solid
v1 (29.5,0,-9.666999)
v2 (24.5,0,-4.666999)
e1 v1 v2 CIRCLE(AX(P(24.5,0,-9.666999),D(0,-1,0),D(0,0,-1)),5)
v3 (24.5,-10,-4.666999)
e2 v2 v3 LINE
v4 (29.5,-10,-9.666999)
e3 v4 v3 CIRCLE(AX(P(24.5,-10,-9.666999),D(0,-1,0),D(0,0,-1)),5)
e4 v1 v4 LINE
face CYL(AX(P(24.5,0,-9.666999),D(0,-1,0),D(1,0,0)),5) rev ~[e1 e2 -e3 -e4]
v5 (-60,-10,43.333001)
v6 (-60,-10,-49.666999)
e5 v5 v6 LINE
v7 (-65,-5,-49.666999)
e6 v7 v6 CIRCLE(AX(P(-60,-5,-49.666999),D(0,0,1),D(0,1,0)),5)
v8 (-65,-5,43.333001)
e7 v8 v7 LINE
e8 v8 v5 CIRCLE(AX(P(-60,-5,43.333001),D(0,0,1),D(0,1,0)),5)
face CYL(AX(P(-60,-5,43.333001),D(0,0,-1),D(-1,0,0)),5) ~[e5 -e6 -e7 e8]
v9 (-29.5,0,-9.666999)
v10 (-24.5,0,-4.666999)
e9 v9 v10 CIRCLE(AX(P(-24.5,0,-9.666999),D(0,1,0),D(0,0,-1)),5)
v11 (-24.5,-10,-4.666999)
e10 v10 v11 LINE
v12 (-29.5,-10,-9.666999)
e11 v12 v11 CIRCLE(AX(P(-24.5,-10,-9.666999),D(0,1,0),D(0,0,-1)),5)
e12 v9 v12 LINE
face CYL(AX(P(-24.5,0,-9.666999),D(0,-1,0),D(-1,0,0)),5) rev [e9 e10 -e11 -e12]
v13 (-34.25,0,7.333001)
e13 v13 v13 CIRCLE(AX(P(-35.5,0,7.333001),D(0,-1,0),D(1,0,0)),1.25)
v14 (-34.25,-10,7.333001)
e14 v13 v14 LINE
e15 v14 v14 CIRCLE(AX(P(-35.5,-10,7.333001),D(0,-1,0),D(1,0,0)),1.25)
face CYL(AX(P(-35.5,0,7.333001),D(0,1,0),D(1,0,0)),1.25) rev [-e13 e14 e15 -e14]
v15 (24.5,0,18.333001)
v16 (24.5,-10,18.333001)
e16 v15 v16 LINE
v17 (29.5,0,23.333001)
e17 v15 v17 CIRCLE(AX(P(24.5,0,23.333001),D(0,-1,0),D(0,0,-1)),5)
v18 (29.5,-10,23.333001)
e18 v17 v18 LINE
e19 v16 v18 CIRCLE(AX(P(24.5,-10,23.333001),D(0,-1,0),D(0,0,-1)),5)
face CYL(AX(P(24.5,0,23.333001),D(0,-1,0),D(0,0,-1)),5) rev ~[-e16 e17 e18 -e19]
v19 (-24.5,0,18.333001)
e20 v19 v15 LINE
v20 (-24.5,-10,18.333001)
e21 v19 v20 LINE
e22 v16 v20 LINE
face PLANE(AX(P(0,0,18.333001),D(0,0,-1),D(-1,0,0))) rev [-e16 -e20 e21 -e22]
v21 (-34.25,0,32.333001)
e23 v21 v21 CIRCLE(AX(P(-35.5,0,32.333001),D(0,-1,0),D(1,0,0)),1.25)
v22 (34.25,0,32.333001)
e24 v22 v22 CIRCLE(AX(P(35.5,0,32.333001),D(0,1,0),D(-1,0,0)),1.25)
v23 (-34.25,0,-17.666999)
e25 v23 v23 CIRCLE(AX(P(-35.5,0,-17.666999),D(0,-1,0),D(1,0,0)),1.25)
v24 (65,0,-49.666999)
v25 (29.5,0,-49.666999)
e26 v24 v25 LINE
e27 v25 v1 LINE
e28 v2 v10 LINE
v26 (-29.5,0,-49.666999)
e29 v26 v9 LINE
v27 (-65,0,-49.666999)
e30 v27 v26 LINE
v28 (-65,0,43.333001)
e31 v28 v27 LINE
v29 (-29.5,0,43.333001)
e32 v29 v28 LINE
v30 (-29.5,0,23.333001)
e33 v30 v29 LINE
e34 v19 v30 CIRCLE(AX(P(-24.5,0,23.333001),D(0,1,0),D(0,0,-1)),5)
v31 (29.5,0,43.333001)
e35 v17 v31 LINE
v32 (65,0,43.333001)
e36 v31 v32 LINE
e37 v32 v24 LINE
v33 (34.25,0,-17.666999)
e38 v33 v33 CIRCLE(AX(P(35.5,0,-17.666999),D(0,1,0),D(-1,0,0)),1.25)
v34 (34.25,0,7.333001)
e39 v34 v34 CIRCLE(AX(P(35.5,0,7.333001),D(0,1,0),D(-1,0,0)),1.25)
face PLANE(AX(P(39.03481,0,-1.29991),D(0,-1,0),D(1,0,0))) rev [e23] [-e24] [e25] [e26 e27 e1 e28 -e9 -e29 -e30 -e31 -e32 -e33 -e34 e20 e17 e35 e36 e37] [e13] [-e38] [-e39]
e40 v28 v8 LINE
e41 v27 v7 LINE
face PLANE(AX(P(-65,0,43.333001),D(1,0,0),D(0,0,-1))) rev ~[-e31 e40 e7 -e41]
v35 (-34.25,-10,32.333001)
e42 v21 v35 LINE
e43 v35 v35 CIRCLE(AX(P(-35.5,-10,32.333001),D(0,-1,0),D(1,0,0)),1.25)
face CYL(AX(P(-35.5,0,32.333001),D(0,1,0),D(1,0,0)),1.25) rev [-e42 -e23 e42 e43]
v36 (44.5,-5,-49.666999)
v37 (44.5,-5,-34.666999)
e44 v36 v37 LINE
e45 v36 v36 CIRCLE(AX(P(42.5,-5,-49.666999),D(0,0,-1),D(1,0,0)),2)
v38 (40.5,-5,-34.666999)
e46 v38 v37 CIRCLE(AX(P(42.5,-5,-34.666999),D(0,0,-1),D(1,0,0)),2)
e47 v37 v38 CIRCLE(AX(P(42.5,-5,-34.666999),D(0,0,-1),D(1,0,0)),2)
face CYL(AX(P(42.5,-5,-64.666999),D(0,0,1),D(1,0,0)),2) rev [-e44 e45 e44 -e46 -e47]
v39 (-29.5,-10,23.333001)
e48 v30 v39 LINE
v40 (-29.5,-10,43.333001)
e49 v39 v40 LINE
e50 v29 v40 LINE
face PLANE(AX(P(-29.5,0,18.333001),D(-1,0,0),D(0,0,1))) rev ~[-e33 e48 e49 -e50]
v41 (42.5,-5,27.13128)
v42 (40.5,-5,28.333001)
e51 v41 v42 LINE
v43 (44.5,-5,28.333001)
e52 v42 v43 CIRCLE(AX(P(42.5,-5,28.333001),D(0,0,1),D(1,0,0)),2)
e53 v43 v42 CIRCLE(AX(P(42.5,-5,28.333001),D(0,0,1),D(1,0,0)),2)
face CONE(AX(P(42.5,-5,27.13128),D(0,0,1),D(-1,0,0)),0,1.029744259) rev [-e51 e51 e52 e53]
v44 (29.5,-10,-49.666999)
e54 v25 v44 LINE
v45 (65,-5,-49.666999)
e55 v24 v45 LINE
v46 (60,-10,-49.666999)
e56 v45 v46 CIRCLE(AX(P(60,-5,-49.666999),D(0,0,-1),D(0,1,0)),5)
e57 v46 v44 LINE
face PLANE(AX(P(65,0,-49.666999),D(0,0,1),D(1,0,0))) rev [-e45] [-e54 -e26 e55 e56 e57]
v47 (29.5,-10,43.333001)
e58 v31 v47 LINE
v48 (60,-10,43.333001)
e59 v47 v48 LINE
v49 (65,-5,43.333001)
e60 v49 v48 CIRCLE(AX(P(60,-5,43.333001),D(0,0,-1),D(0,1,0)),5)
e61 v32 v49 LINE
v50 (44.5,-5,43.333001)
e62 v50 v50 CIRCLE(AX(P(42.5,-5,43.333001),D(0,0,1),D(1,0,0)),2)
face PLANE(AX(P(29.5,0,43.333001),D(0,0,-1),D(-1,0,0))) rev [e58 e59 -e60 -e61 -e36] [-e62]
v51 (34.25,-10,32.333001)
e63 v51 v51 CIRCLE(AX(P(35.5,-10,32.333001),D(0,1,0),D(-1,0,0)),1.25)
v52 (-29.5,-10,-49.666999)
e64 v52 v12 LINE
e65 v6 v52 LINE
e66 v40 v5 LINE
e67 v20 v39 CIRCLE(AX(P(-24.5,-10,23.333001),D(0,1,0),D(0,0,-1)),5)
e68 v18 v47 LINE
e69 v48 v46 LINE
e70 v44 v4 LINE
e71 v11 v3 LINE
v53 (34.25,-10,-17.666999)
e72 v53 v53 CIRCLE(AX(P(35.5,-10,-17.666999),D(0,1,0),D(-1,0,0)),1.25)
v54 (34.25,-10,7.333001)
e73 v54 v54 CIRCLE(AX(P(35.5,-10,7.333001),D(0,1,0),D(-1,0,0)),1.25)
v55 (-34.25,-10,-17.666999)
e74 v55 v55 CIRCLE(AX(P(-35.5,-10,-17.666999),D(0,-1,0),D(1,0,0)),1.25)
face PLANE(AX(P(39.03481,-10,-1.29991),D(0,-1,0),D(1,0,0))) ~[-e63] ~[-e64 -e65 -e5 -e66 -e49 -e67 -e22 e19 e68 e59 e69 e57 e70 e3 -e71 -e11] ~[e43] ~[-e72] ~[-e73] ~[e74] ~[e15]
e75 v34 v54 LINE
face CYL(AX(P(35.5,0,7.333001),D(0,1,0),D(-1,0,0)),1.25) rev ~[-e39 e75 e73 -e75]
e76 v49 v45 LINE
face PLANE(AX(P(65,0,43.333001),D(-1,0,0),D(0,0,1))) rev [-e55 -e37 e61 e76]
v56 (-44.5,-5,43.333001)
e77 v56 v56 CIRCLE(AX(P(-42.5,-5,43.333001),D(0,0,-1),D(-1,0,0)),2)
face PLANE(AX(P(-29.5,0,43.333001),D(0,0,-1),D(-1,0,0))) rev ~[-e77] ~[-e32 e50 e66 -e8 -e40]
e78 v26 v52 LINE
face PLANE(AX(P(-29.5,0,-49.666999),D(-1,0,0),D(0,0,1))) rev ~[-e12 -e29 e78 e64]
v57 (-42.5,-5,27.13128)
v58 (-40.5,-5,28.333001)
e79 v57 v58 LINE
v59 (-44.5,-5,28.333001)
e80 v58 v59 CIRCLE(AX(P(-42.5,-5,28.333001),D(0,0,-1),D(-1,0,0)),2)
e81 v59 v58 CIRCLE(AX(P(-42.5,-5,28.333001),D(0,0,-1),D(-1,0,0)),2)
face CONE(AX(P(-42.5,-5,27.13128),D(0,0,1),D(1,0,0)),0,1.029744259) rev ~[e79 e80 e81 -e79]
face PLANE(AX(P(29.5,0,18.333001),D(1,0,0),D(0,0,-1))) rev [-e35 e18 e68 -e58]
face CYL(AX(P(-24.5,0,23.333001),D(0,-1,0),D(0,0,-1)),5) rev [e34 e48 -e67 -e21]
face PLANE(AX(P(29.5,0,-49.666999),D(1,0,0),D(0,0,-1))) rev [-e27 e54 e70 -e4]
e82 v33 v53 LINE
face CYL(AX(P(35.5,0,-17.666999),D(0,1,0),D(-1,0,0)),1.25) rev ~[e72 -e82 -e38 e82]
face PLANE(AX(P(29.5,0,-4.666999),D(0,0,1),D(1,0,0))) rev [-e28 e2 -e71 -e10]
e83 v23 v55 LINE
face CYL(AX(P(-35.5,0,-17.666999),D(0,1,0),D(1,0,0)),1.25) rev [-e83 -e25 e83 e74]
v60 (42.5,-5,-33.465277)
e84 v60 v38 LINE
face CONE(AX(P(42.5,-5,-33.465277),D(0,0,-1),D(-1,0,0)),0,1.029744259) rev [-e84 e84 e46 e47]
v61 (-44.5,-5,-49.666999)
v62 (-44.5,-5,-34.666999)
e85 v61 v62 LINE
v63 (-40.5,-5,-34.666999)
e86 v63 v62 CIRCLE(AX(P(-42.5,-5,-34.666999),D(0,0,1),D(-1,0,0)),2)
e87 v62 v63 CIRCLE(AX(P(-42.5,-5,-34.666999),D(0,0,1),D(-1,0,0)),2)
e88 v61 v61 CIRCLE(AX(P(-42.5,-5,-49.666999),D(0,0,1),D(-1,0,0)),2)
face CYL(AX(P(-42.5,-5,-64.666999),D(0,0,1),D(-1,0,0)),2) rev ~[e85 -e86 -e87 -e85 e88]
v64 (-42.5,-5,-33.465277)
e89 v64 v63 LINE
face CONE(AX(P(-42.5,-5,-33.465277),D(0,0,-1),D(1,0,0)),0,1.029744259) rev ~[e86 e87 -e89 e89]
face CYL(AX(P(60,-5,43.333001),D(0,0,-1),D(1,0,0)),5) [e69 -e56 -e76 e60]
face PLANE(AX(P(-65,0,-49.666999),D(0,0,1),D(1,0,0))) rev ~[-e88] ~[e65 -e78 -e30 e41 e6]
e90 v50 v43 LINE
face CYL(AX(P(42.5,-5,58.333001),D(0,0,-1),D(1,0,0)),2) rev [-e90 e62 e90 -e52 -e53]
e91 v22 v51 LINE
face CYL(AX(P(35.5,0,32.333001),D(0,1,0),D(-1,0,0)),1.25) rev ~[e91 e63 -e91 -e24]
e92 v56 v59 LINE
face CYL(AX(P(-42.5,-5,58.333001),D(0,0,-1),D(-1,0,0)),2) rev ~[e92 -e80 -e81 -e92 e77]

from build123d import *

# Parameters (mm, degrees)
F0_R           = 1.25
F1_DEPTH       = 10
F2_R           = 5
F5_D           = 4
F5_DEPTH       = 15
F5_TIP         = 1.2017212381
F5_ON_F4_D     = 4
F5_ON_F4_DEPTH = 15
F5_ON_F4_TIP   = 1.2017212381


with BuildPart() as f1:
    # F0 (on Front) → F1 (new body)
    with BuildSketch(Plane.XZ):
        Polygon((-65, 43.3330013267), (-65, -49.6669986733), (-29.5, -49.6669986733), (-29.5, -4.6669986733), (0, -4.6669986733), (0, 18.3330013267), (-29.5, 18.3330013267), (-29.5, 43.3330013267), align=None)
        with Locations((-35.5, -42.6669986733)):
            Circle(F0_R, mode=Mode.SUBTRACT)
        with Locations((-35.5, -17.6669986733)):
            Circle(F0_R, mode=Mode.SUBTRACT)
        with Locations((-35.5, 7.3330013267)):
            Circle(F0_R, mode=Mode.SUBTRACT)
        with Locations((-35.5, 32.3330013267)):
            Circle(F0_R, mode=Mode.SUBTRACT)
        with Locations((-35.5, -42.6669986733)):
            Circle(F0_R)
    extrude(amount=F1_DEPTH)

    # F2
    f2_edges = [f1.edges().sort_by_distance(p)[0] for p in [
        (-65, -10, -3.166999),
        (-29.5, -5, -4.666999),
        (-29.5, -5, 18.333001),
    ]]
    fillet(f2_edges, radius=F2_R)

    # F5
    with Locations(Plane.XY.offset(43.3330013267)):
        with Locations((-42.5, -5)):
            Hole(F5_D / 2, depth=F5_DEPTH)
            with Locations((0, 0, -(F5_DEPTH + F5_TIP / 2))):  # 118° drill point
                Cone(0, F5_D / 2, F5_TIP, mode=Mode.SUBTRACT)

    # F5 on F4
    with Locations(Plane(origin=(0, 0, -49.6669986733), x_dir=(1, 0, 0), z_dir=(0, 0, -1))):
        with Locations((-42.5, 5)):
            Hole(F5_ON_F4_D / 2, depth=F5_ON_F4_DEPTH)
            with Locations((0, 0, -(F5_ON_F4_DEPTH + F5_ON_F4_TIP / 2))):  # 118° drill point
                Cone(0, F5_ON_F4_D / 2, F5_ON_F4_TIP, mode=Mode.SUBTRACT)

    # F6: F1 across plane


with BuildPart() as f1_1:
    add(f1.part)
    add(f1.part.mirror(Plane.YZ))


solid = f1_1.part
